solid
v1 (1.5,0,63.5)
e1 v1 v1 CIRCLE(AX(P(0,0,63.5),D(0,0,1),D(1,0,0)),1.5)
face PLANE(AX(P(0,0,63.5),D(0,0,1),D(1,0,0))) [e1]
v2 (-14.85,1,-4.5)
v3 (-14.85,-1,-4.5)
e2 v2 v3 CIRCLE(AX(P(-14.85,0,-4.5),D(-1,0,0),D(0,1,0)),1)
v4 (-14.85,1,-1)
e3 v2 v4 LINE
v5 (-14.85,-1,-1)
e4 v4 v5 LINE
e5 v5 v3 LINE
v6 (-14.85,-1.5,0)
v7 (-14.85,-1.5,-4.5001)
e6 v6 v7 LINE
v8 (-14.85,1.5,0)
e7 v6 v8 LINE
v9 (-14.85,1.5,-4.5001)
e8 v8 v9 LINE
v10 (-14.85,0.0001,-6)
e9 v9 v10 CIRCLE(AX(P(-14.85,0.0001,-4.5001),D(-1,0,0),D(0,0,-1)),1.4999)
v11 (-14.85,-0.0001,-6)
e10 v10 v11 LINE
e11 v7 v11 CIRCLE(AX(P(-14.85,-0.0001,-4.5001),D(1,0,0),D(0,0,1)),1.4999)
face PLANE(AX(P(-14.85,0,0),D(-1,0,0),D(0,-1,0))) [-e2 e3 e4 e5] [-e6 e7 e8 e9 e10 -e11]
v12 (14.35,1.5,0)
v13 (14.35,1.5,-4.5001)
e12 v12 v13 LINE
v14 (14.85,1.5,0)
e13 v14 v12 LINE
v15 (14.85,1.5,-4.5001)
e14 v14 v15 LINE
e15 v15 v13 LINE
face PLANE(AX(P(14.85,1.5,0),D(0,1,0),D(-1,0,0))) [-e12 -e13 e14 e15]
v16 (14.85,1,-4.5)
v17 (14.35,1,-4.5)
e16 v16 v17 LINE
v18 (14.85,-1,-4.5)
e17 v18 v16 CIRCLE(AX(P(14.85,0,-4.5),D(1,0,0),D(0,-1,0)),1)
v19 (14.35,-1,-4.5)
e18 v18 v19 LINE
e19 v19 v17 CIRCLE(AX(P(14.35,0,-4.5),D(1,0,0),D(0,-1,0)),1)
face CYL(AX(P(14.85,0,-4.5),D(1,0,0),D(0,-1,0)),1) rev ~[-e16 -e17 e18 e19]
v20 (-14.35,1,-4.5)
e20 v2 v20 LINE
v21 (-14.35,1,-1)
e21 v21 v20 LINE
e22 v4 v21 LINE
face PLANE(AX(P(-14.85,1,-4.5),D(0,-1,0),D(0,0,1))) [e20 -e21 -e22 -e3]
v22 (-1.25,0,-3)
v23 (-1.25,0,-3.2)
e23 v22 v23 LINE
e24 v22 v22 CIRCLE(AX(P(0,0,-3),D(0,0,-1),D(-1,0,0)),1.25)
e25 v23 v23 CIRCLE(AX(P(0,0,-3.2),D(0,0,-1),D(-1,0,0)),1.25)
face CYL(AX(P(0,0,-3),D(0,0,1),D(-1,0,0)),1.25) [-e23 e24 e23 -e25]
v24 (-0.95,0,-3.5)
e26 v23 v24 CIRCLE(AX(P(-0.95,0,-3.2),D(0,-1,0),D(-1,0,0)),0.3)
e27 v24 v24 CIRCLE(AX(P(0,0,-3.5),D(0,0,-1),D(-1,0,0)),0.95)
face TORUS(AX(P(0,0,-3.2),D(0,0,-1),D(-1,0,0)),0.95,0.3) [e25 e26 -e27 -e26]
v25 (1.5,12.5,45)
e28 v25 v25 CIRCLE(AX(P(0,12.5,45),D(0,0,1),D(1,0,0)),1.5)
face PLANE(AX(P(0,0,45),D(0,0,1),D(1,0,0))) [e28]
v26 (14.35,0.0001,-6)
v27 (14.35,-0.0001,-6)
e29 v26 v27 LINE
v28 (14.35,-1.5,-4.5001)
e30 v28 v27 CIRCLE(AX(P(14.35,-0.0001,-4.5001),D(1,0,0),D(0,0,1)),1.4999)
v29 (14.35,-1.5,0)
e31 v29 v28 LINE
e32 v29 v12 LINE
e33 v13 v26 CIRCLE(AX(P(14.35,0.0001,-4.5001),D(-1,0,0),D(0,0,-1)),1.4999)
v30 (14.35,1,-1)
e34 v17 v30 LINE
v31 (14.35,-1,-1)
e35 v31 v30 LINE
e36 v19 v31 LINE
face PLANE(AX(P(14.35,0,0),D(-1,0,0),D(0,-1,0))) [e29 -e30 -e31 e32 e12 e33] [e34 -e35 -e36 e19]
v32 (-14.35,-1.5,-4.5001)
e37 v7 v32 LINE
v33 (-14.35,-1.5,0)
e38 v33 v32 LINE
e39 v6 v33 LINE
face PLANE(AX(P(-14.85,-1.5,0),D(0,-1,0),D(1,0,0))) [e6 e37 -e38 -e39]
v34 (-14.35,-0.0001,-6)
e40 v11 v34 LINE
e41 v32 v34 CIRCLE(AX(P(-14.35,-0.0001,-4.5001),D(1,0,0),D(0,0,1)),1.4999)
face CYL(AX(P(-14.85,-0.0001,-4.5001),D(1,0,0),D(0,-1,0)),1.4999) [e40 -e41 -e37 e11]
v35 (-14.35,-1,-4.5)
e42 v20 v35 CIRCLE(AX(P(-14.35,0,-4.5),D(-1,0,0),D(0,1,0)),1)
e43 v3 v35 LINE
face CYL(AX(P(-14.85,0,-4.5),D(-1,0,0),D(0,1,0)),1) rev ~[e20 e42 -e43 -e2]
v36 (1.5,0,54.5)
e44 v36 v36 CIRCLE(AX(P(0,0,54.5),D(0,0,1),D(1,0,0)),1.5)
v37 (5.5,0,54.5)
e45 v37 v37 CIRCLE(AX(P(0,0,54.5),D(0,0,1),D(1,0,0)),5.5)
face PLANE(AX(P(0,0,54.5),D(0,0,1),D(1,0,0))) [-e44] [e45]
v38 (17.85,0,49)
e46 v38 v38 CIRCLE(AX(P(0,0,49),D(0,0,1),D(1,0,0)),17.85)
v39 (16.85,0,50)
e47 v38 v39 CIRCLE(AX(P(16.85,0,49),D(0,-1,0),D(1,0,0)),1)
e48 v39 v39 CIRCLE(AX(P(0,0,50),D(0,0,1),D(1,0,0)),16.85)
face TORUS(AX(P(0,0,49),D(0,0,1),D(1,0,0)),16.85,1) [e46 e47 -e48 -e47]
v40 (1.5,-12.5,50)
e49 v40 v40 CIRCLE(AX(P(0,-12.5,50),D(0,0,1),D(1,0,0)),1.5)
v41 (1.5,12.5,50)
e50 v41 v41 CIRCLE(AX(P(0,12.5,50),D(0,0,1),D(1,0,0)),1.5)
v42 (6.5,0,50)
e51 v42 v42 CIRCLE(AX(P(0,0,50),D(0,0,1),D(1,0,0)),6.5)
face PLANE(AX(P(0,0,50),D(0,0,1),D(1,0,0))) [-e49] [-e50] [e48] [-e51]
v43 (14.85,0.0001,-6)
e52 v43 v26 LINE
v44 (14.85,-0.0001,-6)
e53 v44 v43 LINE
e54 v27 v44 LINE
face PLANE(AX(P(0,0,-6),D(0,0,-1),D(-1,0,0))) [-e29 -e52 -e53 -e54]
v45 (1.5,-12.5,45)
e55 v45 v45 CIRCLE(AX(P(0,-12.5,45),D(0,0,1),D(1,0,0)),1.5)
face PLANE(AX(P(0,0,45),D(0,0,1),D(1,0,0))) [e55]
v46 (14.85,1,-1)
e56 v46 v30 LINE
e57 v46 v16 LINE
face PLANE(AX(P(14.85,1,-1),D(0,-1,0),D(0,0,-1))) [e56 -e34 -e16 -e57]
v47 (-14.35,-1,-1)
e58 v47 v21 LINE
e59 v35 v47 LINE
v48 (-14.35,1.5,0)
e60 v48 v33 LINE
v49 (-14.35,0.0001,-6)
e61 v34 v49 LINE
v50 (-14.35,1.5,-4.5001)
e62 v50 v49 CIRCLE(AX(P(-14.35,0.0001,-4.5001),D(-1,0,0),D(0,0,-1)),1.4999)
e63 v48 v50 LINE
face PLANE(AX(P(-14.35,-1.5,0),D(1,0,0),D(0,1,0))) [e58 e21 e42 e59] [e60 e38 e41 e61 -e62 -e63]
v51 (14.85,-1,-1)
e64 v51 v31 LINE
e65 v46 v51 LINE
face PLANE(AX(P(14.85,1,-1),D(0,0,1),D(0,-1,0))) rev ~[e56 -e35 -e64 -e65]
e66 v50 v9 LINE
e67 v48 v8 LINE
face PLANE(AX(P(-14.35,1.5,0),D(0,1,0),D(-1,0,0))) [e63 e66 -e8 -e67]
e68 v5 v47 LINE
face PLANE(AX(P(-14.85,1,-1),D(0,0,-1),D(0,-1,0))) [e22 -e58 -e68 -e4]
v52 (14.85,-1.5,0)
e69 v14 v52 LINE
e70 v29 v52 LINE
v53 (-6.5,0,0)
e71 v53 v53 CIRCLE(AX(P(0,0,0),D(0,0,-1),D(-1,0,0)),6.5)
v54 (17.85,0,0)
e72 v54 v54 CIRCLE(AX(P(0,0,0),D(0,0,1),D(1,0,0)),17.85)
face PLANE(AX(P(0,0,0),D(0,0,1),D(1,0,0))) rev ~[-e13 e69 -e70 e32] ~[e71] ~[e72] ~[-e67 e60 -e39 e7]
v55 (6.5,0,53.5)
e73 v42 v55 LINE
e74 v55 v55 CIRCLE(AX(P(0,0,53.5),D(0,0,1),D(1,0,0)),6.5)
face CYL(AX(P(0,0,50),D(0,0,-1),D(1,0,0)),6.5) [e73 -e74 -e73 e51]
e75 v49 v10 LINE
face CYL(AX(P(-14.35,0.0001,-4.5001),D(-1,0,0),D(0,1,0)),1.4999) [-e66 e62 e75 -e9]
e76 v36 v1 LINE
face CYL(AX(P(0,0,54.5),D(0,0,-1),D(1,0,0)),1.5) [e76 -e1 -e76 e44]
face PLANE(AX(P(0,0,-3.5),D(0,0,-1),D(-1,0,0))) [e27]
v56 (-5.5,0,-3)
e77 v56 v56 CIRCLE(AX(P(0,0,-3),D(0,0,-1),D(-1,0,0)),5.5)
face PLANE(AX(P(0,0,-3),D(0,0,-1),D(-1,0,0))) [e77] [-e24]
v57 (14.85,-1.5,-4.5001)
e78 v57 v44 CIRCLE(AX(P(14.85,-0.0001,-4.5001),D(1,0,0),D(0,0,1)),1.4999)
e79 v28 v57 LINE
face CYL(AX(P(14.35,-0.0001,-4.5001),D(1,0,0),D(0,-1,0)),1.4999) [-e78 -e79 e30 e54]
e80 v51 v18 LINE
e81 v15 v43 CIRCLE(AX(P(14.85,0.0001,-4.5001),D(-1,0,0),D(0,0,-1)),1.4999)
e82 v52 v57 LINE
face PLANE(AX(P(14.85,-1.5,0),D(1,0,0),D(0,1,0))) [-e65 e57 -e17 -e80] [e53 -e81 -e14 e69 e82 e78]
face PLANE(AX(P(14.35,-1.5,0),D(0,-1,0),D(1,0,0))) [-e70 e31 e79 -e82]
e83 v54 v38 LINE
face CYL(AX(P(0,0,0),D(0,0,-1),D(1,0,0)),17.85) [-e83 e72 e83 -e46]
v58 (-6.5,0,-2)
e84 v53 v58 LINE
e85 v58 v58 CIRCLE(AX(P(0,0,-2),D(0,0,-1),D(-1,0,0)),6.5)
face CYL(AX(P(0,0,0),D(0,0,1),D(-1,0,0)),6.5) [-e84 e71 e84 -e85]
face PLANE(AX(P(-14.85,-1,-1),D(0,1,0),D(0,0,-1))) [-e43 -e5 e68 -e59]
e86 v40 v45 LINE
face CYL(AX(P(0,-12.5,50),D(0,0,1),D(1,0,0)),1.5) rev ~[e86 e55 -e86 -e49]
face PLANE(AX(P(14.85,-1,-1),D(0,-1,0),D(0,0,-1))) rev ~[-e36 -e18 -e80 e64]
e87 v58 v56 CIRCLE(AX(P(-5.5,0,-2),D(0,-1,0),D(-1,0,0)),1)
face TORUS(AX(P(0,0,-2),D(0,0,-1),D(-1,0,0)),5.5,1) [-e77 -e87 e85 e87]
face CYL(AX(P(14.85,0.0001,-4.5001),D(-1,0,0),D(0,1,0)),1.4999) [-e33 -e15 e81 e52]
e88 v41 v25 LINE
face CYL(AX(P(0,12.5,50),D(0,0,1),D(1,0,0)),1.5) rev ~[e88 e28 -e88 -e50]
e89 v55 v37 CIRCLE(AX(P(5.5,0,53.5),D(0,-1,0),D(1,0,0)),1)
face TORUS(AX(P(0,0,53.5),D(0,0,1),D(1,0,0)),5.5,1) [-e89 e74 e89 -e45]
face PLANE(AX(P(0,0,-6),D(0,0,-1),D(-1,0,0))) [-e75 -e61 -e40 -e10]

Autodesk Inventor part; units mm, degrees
ref_plane "YZ Plane" through (0, 0, 0) normal (1, 0, 0) x (0, 1, 0)
ref_plane "XZ Plane" through (0, 0, 0) normal (0, 1, 0) x (-1, 0, 0)
ref_plane "XY Plane" through (0, 0, 0) normal (0, 0, 1) x (1, 0, 0)
sketch "Эскиз1" plane through (0, 0, 0) normal (0, 0, 1) x (1, 0, 0)
  circle A0 centre (0, 0) radius 17.85
  dimension "d37" = 35.7
extrude "Выдавливание1" add sketch "Эскиз1" along normal blind 50
sketch "Sketch7" plane through (0, 0, 50) normal (0, 0, 1) x (1, 0, 0)
  circle A0 centre (0, 0) radius 6.5
  dimension "d40" = 13
extrude "Extrusion7" add sketch "Sketch7" along normal blind 4.5
sketch "Sketch8" plane through (0, 0, 54.5) normal (0, 0, 1) x (1, 0, 0)
  circle A0 centre (0, 0) radius 1.5
  dimension "d43" = 3
extrude "Extrusion8" add sketch "Sketch8" along normal blind 9
sketch "Sketch10" plane through (0, 0, 50) normal (0, 0, 1) x (1, 0, 0)
  circle A0 centre (0, 12.5) radius 1.5
  circle A1 centre (0, -12.5) radius 1.5
  point P0 (0, 0)
  dimension "d53" = 3
  dimension "d54" = 3
  dimension "d58" = 12.5
  dimension "d59" = 12.5
extrude "Extrusion9" cut sketch "Sketch10" against normal blind 5
thread "Thread1" size "M3x0.5" class "6H" standard "ANSI Metric M Profile" full length
thread "Thread2" size "M3x0.5" class "6H" standard "ANSI Metric M Profile" full length
sketch "Sketch12" plane through (0, 0, 0) normal (0, 0, -1) x (-1, 0, 0)
  circle A0 centre (0, 0) radius 6.5
  dimension "d67" = 13
extrude "Extrusion10" add sketch "Sketch12" along normal blind 3
sketch "Sketch13" plane through (0, 0, -3) normal (0, 0, -1) x (-1, 0, 0)
  circle A0 centre (0, 0) radius 1.25
  dimension "d70" = 2.5
extrude "Extrusion11" add sketch "Sketch13" along normal blind 0.5
fillet "Fillet3" radius 1 1 edges at (6.5, 0, -3)
fillet "Fillet4" radius 0.3 1 edges at (1.25, 0, -3.5)
fillet "Fillet5" radius 1 1 edges at (-6.5, 0, 54.5)
sketch "Sketch14" plane through (0, 0, 0) normal (0, 0, -1) x (-1, 0, 0)
  line L0 (14.85, -1.5) -> (14.35, -1.5)
  line L1 (14.35, -1.5) -> (14.35, 1.5)
  line L2 (14.35, 1.5) -> (14.85, 1.5)
  line L3 (14.85, 1.5) -> (14.85, -1.5)
  line L4 (-14.35, -1.5) -> (-14.85, -1.5)
  line L5 (-14.85, -1.5) -> (-14.85, 1.5)
  line L6 (-14.85, 1.5) -> (-14.35, 1.5)
  line L7 (-14.35, 1.5) -> (-14.35, -1.5)
  line L8 (0, 0) -> (18.9187, 0)
  circle A0 centre (0, 0) radius 1.5 projected
  line L9 (0, 0) -> (-19.0249, 0)
  dimension "d76" = 0.5
  dimension "d77" = 0.5
  dimension "d78" = 28.7
  dimension "d79" = 14.35
  dimension "d80" = 3
extrude "Extrusion12" add sketch "Sketch14" along normal blind 6 contours L0 L1 L8 L3 | L8 L1 L2 L3 | L4 L5 L9 L7 | L9 L5 L6 L7
fillet "Fillet6" radius 1.5 4 edges at (-14.6, -1.5, -6) (-14.6, 1.5, -6) (14.6, -1.5, -6) (14.6, 1.5, -6)
sketch "Sketch15" plane through (-14.85, -1.5, 0) normal (-1, 0, 0) x (0, 0, 1)
  line L0 (-1, 0.5) -> (-4.5, 0.5)
  line L1 (-4.5, 2.5) -> (-1, 2.5)
  line L2 (-1, 2.5) -> (-1, 0.5)
  line L3 (0, 0) -> (-4.5, 0) projected
  line L4 (0, 3) -> (-4.5, 3) projected
  line L5 (0, -16.35) -> (0, 19.35) projected
  arc A0 (-4.5, 2.5) -> (-4.5, 0.5) centre (-4.5, 1.5) ccw
  point P0 (0, 1.5)
  dimension "d84" = 0.5
  dimension "d85" = 0.5
  dimension "d86" = 1
  dimension "d87" = 3.5
  dimension "d88" = 3.5
  dimension "d89" = 1
extrude "Extrusion13" cut sketch "Sketch15" against normal blind 1
sketch "Sketch16" plane through (14.85, -1.5, 0) normal (1, 0, 0) x (0, 0, -1)
  line L0 (1, 2.5) -> (1, 0.5) projected
  line L1 (1, 2.5) -> (4.5, 2.5) projected
  line L2 (1, 0.5) -> (4.5, 0.5)
  line L3 (4.5, 2.5) -> (1, 2.5)
  line L4 (1, 2.5) -> (1, 0.5)
  arc A0 (4.5, 0.5) -> (4.5, 2.5) centre (4.5, 1.5) ccw projected
  arc A1 (4.5, 0.5) -> (4.5, 2.5) centre (4.5, 1.5) ccw
  point P0 (0, 1.5)
  dimension "d92" = 1
extrude "Extrusion14" cut sketch "Sketch16" against normal blind 1
fillet "Fillet7" radius 1 1 edges at (-17.85, 0, 50)
properties part number "R370-25120" material "Stainless Steel, 440C"
